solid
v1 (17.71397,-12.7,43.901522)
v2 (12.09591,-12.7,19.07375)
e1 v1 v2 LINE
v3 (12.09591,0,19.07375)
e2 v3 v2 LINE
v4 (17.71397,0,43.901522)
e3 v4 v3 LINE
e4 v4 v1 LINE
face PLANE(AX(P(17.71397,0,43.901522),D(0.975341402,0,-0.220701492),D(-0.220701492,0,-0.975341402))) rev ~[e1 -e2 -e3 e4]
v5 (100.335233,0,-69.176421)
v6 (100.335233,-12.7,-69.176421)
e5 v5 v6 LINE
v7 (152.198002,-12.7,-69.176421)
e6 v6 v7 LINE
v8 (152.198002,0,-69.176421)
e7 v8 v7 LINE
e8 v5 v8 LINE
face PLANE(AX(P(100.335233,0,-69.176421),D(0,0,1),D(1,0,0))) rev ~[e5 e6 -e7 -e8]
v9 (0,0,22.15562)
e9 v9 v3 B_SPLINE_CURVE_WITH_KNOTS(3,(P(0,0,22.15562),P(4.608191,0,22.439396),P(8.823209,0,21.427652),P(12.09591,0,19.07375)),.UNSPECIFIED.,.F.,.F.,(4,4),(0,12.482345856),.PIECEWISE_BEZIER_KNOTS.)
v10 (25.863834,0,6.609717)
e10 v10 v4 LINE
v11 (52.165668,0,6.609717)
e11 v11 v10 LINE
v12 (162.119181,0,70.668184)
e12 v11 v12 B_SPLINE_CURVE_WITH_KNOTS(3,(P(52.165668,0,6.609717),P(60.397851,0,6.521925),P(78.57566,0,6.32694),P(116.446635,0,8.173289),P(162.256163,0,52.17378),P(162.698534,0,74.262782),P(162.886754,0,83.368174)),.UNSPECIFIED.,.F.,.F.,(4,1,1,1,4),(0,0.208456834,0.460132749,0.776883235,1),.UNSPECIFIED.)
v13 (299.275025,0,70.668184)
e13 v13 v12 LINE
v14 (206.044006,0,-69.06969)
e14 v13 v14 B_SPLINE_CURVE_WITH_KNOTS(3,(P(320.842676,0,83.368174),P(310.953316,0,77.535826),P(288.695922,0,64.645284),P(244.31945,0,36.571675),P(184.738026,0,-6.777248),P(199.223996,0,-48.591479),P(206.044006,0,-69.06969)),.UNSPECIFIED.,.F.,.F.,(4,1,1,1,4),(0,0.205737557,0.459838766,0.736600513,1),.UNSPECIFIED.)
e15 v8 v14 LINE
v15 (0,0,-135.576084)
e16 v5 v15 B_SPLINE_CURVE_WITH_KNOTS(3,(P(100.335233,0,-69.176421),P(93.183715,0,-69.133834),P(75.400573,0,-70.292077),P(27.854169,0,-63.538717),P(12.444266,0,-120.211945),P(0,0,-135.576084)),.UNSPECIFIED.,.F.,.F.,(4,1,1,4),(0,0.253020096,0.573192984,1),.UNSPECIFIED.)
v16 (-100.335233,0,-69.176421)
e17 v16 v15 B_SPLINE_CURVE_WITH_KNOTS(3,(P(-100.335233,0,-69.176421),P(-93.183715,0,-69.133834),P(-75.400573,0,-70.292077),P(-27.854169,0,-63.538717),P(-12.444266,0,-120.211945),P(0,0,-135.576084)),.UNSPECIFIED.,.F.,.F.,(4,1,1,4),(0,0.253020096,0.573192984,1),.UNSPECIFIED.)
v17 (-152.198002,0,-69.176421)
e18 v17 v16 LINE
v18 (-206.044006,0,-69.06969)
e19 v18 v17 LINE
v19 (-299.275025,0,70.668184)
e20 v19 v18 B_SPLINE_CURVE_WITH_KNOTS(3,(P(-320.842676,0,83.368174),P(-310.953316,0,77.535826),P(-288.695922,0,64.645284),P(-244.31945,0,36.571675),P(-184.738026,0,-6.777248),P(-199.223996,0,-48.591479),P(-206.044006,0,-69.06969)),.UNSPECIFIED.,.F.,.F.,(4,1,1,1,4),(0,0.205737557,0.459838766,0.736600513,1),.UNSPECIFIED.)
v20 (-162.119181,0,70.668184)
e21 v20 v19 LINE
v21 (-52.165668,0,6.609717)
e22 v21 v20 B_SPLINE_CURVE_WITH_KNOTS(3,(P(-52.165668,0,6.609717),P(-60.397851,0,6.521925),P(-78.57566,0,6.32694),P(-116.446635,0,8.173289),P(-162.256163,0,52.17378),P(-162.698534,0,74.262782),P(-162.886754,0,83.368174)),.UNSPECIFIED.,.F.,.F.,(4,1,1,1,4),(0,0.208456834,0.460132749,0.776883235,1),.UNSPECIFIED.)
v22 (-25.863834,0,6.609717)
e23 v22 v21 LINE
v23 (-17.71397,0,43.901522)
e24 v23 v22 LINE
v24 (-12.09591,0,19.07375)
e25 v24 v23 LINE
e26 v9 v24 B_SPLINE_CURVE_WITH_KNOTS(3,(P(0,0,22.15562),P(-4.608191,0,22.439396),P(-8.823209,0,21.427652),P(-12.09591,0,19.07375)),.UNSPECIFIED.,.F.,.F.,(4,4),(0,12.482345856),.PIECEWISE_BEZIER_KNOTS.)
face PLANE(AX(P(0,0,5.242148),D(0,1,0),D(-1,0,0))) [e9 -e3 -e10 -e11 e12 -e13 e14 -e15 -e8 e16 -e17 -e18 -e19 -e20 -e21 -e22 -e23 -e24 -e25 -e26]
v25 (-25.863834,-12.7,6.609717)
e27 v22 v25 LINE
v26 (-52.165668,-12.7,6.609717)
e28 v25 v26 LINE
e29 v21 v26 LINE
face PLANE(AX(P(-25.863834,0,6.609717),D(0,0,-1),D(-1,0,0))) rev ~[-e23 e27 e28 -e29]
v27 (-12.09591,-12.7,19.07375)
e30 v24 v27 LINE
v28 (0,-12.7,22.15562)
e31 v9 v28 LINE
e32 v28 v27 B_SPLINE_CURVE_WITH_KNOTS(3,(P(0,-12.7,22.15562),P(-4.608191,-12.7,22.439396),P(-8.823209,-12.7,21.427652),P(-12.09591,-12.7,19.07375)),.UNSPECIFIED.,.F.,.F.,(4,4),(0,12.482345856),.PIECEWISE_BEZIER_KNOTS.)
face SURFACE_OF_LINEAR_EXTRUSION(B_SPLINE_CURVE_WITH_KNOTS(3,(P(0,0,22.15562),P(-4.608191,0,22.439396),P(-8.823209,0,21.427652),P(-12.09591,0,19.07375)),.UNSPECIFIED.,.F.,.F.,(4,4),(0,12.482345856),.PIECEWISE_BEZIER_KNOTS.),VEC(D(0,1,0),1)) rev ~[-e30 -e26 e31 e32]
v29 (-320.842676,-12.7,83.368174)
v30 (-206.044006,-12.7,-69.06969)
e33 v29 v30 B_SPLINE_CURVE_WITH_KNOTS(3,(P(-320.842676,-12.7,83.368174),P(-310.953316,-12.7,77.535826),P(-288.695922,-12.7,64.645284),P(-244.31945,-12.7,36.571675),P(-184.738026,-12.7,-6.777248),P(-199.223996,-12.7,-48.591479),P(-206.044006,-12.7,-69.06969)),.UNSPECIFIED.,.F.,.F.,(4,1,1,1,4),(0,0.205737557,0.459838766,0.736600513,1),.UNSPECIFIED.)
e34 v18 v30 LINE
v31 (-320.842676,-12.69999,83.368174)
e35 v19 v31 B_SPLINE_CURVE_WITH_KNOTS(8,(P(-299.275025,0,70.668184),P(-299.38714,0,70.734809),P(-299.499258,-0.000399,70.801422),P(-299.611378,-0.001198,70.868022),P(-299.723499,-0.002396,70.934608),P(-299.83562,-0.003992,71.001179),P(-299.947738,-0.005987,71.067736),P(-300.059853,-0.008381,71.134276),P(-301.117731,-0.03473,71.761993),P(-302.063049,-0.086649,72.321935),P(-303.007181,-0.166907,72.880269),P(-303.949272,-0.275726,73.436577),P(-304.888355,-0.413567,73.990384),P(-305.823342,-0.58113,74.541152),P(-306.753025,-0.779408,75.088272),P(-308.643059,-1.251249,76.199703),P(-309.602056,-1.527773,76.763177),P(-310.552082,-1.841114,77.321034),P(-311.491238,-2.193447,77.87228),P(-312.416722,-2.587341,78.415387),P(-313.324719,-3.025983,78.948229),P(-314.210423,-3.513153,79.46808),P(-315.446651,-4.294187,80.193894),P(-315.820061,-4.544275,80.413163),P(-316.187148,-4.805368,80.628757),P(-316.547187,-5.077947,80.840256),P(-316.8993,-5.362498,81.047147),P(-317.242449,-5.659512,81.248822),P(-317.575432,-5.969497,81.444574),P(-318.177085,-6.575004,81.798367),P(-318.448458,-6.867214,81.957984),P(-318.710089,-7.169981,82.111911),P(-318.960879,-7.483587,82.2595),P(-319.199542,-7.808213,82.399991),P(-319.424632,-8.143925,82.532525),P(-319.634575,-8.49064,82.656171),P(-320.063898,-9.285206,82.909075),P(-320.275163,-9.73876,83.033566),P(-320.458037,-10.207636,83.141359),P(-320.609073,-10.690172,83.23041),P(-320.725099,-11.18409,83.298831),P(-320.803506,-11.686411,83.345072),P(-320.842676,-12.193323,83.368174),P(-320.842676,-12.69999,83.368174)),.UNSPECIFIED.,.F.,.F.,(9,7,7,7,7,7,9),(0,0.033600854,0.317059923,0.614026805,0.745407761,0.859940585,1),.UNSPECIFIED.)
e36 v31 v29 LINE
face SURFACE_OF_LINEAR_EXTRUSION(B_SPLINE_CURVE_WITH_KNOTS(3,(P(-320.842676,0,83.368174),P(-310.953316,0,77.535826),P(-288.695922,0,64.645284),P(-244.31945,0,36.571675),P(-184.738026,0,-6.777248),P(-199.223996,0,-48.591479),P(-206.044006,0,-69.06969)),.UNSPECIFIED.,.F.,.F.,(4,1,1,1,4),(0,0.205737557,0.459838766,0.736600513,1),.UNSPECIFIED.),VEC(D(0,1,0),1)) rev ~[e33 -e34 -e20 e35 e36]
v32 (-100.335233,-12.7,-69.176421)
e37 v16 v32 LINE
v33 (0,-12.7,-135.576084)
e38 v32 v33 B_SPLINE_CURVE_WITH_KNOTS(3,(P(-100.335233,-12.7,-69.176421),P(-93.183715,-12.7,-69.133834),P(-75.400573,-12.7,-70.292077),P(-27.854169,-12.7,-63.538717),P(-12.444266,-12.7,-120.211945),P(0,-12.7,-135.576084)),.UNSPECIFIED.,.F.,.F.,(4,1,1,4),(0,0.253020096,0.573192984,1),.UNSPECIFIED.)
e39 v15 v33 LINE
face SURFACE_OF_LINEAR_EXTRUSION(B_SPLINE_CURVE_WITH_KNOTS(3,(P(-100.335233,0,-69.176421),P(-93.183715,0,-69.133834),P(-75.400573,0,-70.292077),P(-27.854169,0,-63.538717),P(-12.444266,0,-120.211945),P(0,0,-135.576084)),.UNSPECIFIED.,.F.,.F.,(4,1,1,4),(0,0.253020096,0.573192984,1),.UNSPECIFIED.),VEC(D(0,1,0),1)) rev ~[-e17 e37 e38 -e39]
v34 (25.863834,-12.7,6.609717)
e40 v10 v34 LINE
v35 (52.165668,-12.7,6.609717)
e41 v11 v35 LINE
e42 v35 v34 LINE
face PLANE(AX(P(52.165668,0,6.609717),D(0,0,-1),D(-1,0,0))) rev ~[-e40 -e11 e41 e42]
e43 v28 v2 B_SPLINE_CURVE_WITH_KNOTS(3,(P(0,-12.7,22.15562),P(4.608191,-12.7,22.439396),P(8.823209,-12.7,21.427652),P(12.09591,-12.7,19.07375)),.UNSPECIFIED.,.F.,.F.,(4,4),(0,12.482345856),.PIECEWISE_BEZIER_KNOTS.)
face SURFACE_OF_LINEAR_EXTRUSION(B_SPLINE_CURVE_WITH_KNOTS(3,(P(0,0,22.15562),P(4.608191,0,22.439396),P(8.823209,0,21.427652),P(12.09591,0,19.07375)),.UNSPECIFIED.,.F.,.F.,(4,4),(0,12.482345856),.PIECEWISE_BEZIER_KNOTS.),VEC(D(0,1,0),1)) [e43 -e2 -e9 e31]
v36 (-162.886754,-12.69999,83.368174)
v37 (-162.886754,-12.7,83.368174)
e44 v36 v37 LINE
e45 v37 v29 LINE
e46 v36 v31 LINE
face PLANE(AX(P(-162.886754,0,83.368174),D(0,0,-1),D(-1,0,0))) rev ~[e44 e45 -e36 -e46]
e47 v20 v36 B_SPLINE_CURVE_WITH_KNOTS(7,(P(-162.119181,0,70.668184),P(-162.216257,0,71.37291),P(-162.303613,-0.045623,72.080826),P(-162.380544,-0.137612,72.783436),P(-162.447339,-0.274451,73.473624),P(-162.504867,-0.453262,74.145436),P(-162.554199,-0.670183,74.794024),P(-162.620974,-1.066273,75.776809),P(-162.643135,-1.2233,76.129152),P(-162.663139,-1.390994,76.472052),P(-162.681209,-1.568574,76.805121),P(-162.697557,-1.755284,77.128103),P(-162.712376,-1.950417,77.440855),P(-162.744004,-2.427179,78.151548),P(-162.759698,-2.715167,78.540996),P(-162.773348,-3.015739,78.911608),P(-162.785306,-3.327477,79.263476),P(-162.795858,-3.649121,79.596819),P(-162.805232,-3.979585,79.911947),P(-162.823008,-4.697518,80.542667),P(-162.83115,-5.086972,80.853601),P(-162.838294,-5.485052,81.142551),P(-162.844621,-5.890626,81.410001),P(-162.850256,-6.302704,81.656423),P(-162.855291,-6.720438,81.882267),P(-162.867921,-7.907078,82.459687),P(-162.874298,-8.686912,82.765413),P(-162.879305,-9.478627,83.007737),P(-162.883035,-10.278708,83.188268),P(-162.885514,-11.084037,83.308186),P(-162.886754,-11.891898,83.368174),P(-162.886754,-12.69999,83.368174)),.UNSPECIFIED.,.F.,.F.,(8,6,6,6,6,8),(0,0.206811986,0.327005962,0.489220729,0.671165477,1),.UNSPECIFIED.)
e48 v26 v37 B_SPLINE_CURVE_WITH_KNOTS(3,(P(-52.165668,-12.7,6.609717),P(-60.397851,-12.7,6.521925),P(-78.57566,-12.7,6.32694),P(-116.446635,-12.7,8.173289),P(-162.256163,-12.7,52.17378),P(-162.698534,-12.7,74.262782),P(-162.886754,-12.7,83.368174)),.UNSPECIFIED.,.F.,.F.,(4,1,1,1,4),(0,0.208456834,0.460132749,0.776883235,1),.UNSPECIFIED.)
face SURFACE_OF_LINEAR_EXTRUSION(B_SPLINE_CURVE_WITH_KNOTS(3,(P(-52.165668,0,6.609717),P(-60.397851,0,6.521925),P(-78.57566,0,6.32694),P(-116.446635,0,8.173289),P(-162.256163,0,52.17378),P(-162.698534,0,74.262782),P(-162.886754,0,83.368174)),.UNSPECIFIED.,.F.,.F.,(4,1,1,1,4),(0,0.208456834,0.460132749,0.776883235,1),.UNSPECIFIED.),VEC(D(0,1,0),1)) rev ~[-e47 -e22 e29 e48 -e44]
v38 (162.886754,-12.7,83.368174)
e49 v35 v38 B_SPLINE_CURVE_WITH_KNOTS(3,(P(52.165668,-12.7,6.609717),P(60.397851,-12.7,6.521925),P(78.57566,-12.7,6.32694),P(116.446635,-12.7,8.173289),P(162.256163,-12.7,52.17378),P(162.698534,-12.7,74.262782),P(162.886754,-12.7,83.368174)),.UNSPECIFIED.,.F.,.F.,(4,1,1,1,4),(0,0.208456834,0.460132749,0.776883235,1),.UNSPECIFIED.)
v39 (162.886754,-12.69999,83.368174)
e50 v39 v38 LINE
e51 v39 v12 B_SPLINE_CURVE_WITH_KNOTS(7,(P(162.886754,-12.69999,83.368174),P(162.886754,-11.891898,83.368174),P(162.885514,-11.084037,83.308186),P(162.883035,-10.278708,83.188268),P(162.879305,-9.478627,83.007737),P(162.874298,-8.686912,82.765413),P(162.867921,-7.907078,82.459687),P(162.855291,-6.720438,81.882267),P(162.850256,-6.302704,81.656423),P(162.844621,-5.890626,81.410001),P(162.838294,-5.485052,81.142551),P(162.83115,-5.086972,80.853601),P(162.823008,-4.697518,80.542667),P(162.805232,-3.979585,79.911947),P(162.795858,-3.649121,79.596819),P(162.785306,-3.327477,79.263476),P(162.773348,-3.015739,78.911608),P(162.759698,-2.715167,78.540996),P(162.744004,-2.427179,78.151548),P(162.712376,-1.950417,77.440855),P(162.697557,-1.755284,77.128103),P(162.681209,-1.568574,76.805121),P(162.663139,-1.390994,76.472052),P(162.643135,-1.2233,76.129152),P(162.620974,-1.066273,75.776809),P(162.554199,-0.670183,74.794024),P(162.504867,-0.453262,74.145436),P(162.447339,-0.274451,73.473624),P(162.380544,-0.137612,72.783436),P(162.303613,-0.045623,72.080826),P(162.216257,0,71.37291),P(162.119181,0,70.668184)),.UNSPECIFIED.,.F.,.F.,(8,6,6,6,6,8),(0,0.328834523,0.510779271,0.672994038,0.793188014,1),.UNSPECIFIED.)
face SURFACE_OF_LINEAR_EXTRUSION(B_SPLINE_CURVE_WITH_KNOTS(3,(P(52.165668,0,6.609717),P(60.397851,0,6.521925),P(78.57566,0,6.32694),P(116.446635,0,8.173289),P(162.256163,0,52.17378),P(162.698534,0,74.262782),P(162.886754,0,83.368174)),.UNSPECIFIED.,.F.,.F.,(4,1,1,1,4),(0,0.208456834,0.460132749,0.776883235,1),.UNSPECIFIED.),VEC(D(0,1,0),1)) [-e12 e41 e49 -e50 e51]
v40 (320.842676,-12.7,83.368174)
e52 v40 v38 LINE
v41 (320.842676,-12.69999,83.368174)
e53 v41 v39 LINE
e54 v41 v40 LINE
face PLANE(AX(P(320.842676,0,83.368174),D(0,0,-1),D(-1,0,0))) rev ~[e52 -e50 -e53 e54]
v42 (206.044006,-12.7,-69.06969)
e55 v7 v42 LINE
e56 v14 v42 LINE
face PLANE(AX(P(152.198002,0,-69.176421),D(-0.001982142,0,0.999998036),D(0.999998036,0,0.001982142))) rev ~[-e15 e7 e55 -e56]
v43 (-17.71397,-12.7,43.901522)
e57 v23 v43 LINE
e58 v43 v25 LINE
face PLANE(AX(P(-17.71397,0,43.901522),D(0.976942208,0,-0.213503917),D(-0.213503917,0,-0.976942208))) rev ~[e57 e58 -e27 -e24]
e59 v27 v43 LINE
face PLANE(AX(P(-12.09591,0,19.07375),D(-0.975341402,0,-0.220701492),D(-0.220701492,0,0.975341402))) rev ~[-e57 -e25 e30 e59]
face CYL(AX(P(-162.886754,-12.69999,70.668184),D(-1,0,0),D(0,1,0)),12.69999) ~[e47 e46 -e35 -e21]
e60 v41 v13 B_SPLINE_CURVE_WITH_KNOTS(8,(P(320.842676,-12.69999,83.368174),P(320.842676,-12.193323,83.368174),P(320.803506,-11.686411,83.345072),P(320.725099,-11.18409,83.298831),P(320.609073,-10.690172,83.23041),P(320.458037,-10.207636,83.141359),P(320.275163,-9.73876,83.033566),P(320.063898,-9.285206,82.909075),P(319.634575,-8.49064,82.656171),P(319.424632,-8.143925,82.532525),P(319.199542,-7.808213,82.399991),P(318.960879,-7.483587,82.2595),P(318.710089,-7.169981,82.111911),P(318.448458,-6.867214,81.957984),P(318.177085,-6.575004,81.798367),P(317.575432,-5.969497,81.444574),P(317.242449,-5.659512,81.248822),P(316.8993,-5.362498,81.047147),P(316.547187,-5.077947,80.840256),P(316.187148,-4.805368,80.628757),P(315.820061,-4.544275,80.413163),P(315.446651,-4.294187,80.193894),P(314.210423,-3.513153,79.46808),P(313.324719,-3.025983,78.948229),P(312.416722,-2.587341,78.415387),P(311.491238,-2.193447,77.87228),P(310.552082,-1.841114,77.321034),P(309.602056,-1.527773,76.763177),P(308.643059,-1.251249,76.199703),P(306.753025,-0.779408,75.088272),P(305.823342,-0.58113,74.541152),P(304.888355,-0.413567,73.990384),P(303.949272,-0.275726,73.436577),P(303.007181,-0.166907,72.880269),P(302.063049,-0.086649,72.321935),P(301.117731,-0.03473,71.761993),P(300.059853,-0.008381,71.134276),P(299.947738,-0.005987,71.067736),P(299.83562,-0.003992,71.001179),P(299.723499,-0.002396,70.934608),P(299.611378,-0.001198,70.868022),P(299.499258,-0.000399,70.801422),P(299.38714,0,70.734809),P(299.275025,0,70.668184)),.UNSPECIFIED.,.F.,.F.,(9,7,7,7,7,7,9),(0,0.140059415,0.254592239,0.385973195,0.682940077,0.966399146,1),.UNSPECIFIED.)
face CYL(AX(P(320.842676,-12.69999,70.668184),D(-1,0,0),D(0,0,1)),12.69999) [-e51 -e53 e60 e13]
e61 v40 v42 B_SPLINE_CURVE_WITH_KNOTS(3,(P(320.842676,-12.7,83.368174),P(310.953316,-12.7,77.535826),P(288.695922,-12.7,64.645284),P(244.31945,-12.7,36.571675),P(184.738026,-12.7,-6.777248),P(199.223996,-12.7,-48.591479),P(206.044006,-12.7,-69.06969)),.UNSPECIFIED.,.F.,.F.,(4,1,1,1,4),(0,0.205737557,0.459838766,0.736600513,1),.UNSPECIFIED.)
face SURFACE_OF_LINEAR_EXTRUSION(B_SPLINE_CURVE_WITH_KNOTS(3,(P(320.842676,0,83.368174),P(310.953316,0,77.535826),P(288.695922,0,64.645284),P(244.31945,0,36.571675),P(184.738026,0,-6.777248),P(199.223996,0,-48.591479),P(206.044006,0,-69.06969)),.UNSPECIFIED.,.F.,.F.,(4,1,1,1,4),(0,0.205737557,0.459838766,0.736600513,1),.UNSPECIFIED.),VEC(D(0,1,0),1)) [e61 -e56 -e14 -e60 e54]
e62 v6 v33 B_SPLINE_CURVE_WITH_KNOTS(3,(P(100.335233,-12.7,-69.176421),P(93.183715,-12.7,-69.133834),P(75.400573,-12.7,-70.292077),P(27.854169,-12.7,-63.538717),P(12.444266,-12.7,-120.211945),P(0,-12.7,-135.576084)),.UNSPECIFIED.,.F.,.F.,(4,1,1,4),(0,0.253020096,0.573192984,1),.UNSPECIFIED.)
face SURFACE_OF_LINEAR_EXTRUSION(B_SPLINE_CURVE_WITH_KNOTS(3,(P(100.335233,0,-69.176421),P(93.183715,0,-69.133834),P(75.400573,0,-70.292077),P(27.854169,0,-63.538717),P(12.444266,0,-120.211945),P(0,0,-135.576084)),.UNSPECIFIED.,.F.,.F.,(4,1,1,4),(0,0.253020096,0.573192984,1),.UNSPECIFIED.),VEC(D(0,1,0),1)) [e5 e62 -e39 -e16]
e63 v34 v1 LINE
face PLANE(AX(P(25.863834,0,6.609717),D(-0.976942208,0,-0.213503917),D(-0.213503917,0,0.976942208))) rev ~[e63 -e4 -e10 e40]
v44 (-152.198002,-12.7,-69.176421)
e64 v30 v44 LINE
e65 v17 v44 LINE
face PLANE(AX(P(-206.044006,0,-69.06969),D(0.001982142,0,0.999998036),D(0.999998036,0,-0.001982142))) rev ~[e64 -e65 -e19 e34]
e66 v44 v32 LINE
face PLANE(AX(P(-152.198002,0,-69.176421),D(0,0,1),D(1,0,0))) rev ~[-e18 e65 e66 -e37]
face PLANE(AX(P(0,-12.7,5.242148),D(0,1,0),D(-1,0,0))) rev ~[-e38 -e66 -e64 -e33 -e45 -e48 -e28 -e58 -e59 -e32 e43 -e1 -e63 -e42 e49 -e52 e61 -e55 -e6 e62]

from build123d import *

# Parameters (mm, degrees)
F1_DEPTH = 12.7
F2_R     = 12.69999
F3_R     = 12.69999


# Not quite as in the source:
# - a fillet or chamfer is up to 0.001 mm smaller than in the source, because OpenCascade refuses the exact size


with BuildPart() as f1:
    # F0 (on Front) → F1 (new body)
    with BuildSketch(Plane.XZ):
        with BuildLine():
            add(Edge.make_bspline(
                [(0, 22.1556201577), (4.6081906185, 22.4393960088), (8.8232094422, 21.4276518673), (12.0959098929, 19.0737502837)],
                knots=[0, 0, 0, 0, 12.4823458556, 12.4823458556, 12.4823458556, 12.4823458556], degree=3))
            add(Edge.make_bspline(
                [(0, 22.1556201577), (-4.6081906185, 22.4393960088), (-8.8232094422, 21.4276518673), (-12.0959098929, 19.0737502837)],
                knots=[0, 0, 0, 0, 12.4823458556, 12.4823458556, 12.4823458556, 12.4823458556], degree=3))
            Line((-12.0959098929, 19.0737502837), (-17.7139695734, 43.9015217125))
            Line((-17.7139695734, 43.9015217125), (-25.8638337255, 6.609717384))
            Line((-25.8638337255, 6.609717384), (-52.1656684577, 6.609717384))
            add(Edge.make_bspline(
                [(-52.1656684577, 6.609717384), (-60.3978514517, 6.5219254793), (-78.5756597545, 6.3269402408), (-116.4466347426, 8.1732890136), (-162.2561628931, 52.1737802861), (-162.6985337077, 74.2627820904), (-162.8867536783, 83.3681735719)],
                knots=[0, 0, 0, 0, 0.2084568336, 0.4601327492, 0.7768832352, 1, 1, 1, 1], degree=3))
            Line((-162.8867536783, 83.3681735719), (-320.8426764241, 83.3681735719))
            add(Edge.make_bspline(
                [(-320.8426764241, 83.3681735719), (-310.9533159528, 77.5358259805), (-288.6959219459, 64.6452840474), (-244.3194495003, 36.5716752771), (-184.7380258313, -6.777248073), (-199.2239955574, -48.5914785577), (-206.0440058214, -69.0696899563)],
                knots=[0, 0, 0, 0, 0.2057375573, 0.4598387655, 0.7366005134, 1, 1, 1, 1], degree=3))
            Line((-206.0440058214, -69.0696899563), (-152.1980017424, -69.1764205694))
            Line((-152.1980017424, -69.1764205694), (-100.3352329135, -69.1764205694))
            add(Edge.make_bspline(
                [(-100.3352329135, -69.1764205694), (-93.1837151487, -69.1338341935), (-75.4005733711, -70.292076661), (-27.8541687884, -63.5387172898), (-12.4442655786, -120.211944878), (0, -135.5760842562)],
                knots=[0, 0, 0, 0, 0.2530200956, 0.5731929838, 1, 1, 1, 1], degree=3))
            add(Edge.make_bspline(
                [(100.3352329135, -69.1764205694), (93.1837151487, -69.1338341935), (75.4005733711, -70.292076661), (27.8541687884, -63.5387172898), (12.4442655786, -120.211944878), (0, -135.5760842562)],
                knots=[0, 0, 0, 0, 0.2530200956, 0.5731929838, 1, 1, 1, 1], degree=3))
            Line((100.3352329135, -69.1764205694), (152.1980017424, -69.1764205694))
            Line((152.1980017424, -69.1764205694), (206.0440058214, -69.0696899563))
            add(Edge.make_bspline(
                [(320.8426764241, 83.3681735719), (310.9533159528, 77.5358259805), (288.6959219459, 64.6452840474), (244.3194495003, 36.5716752771), (184.7380258313, -6.777248073), (199.2239955574, -48.5914785577), (206.0440058214, -69.0696899563)],
                knots=[0, 0, 0, 0, 0.2057375573, 0.4598387655, 0.7366005134, 1, 1, 1, 1], degree=3))
            Line((320.8426764241, 83.3681735719), (162.8867536783, 83.3681735719))
            add(Edge.make_bspline(
                [(52.1656684577, 6.609717384), (60.3978514517, 6.5219254793), (78.5756597545, 6.3269402408), (116.4466347426, 8.1732890136), (162.2561628931, 52.1737802861), (162.6985337077, 74.2627820904), (162.8867536783, 83.3681735719)],
                knots=[0, 0, 0, 0, 0.2084568336, 0.4601327492, 0.7768832352, 1, 1, 1, 1], degree=3))
            Line((52.1656684577, 6.609717384), (25.8638337255, 6.609717384))
            Line((25.8638337255, 6.609717384), (17.7139695734, 43.9015217125))
            Line((17.7139695734, 43.9015217125), (12.0959098929, 19.0737502837))
        make_face()
    extrude(amount=F1_DEPTH)

    # F2 (radius 12.7 in the source; OpenCascade refuses exactly that, so slightly less here)
    f2_edges = [f1.edges().sort_by_distance(p)[0] for p in [
        (241.864715, 0, 83.368174),
    ]]
    fillet(f2_edges, radius=F2_R)

    # F3 (radius 12.7 in the source; OpenCascade refuses exactly that, so slightly less here)
    f3_edges = [f1.edges().sort_by_distance(p)[0] for p in [
        (-241.864715, 0, 83.368174),
    ]]
    fillet(f3_edges, radius=F3_R)


solid = f1.part
